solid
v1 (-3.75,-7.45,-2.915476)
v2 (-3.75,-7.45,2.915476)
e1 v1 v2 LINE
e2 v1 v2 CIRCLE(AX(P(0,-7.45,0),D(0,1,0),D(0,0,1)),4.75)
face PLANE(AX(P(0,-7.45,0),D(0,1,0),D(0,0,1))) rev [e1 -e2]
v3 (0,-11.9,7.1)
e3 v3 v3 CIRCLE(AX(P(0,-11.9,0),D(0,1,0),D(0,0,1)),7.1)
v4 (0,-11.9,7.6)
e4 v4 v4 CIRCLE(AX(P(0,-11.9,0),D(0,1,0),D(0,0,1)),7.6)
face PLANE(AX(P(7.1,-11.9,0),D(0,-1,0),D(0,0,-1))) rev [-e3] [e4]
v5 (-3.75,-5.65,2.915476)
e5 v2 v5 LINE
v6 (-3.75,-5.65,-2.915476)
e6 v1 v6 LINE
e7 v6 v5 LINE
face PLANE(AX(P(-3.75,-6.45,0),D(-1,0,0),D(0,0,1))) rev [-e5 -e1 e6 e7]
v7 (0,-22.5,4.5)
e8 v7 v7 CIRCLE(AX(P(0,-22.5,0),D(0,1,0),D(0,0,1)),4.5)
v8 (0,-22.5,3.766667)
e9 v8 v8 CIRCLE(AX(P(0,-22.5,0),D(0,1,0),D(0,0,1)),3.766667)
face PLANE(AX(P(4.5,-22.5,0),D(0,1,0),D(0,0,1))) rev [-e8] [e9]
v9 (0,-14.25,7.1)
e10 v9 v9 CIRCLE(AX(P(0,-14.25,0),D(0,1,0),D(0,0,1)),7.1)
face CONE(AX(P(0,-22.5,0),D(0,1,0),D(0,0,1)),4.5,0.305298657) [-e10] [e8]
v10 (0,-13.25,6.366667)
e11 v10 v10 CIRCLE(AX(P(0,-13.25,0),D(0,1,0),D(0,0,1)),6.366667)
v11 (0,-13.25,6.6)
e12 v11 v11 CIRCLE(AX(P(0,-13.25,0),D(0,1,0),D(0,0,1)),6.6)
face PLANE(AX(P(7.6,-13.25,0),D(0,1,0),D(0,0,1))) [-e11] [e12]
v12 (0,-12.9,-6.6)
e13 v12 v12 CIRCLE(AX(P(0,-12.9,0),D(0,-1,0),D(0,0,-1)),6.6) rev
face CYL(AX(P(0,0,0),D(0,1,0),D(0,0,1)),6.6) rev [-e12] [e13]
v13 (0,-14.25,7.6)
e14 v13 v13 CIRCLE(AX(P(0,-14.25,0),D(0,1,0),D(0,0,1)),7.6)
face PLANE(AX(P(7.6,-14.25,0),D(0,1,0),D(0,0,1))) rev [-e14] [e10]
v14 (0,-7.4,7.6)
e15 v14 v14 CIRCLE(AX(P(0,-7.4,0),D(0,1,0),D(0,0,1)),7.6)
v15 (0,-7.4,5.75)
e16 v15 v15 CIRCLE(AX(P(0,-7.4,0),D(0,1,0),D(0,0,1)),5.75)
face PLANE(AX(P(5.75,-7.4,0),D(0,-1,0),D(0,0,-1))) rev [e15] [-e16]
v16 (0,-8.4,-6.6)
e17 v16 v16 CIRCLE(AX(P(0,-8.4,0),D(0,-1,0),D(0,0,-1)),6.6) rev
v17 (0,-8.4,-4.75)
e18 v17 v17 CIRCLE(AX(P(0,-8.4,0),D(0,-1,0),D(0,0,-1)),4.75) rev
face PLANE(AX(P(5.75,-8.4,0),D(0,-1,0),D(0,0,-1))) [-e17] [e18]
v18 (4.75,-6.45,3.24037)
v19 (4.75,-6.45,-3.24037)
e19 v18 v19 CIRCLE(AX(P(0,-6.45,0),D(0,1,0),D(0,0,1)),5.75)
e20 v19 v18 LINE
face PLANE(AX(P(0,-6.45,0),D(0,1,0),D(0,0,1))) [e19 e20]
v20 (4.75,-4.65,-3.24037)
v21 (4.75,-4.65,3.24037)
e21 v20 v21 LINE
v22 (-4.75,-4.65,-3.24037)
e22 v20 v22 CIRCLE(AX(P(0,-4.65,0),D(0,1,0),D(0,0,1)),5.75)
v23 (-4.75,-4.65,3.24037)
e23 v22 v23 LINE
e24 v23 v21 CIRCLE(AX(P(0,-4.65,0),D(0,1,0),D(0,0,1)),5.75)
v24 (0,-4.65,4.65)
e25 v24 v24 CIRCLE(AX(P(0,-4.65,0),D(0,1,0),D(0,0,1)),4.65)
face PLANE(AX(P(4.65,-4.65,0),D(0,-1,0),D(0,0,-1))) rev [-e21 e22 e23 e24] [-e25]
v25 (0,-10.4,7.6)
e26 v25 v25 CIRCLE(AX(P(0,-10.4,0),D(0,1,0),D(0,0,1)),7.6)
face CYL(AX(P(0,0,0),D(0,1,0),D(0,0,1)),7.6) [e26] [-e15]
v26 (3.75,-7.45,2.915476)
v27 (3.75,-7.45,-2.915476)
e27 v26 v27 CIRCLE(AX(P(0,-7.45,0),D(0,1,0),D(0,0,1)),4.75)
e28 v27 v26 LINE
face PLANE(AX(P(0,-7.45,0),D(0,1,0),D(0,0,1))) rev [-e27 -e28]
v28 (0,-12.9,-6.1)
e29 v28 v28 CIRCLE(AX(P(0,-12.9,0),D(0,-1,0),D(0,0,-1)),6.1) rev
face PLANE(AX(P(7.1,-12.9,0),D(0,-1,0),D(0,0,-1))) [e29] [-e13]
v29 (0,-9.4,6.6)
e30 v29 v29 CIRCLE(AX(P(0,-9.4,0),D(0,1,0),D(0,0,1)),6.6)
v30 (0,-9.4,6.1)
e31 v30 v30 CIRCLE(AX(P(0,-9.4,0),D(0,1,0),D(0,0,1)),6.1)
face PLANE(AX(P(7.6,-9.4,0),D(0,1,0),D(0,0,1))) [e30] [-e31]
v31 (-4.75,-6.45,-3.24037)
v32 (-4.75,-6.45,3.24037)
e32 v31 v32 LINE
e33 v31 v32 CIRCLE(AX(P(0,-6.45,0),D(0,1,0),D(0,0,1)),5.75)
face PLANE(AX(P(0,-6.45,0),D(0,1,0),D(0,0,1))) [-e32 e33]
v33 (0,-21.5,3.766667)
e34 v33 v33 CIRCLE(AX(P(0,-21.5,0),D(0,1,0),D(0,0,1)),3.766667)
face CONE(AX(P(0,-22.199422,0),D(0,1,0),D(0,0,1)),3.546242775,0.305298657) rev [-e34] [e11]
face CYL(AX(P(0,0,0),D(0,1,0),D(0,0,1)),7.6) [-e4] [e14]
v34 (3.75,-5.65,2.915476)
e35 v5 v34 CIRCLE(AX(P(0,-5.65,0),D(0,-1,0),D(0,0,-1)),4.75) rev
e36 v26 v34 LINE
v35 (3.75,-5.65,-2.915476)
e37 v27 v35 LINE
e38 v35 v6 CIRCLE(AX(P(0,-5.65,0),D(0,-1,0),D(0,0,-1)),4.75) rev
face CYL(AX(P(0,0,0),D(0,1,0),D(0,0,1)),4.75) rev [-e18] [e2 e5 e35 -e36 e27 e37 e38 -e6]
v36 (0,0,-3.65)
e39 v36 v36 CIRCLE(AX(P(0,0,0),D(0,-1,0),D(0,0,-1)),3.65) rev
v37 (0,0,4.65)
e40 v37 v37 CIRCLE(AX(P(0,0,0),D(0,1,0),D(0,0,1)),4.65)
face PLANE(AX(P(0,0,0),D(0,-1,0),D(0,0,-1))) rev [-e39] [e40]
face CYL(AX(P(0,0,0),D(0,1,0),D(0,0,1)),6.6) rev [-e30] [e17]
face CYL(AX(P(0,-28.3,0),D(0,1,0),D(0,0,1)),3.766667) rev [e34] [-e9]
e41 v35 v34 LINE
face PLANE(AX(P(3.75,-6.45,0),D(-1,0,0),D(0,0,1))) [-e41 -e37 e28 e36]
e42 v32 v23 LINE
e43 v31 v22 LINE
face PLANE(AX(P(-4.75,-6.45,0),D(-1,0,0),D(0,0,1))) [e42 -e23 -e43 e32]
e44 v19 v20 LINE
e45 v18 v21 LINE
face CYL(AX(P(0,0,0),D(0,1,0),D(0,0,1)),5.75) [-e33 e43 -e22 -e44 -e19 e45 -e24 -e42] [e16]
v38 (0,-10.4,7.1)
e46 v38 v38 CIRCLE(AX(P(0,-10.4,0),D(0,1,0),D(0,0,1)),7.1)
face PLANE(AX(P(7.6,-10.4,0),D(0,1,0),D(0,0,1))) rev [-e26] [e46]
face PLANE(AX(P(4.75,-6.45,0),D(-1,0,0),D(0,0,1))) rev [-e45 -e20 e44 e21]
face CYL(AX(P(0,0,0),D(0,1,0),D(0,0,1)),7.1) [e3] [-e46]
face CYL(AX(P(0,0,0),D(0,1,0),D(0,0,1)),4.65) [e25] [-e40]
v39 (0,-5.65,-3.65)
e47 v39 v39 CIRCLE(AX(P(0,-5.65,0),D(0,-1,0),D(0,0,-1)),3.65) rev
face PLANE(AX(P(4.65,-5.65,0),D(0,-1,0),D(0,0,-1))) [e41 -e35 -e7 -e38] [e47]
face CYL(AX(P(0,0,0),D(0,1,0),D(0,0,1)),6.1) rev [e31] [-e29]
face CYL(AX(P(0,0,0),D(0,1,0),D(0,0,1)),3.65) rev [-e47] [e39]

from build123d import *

# Parameters (mm, degrees)
CUT_EXTRUDE1_DEPTH   = 1.8
SHELL1_START         = -21.5
SHELL1_OUTLINE_R     = 3.65
SHELL1_DEPTH         = 21.5
SHELL1_START_2       = -13.25
SHELL1_2_OUTLINE_R   = 6.1
SHELL1_2_OUTLINE_R_2 = 3.65
SHELL1_2_DEPTH       = 4.85
SHELL1_START_3       = -8.4
SHELL1_3_OUTLINE_R   = 3.65
SHELL1_3_DEPTH       = 2.75
SHELL1_START_4       = -9.4
SHELL1_4_OUTLINE_R   = 6.6
SHELL1_4_OUTLINE_R_2 = 6.1
SHELL1_4_DEPTH       = 1
SHELL1_5_DEPTH       = 0.95
SHELL1_6_OUTLINE_R   = 6.6
SHELL1_6_OUTLINE_R_2 = 6.1
SHELL1_6_DEPTH       = 0.35
SKETCH3_R            = 3.766666667
CUT_EXTRUDE2_DEPTH   = 6.8


with BuildPart() as part:
    # Sketch1 → Revolve1 (revolve)
    with BuildSketch(Plane.XY, mode=Mode.PRIVATE) as revolve1_sk:
        Polygon((0, 0), (0, -22.5), (4.5, -22.5), (7.1, -14.25), (7.6, -14.25), (7.6, -11.9), (7.1, -11.9), (7.1, -10.4), (7.6, -10.4), (7.6, -7.4), (5.75, -7.4), (5.75, -4.65), (4.65, -4.65), (4.65, 0), align=None)
    revolve(revolve1_sk.sketch.rotate(Axis((0, 0, 0), (0, -1, 0)), 90), axis=Axis((0, 0, 0), (0, -1, 0)))

    # Sketch2 → Cut-Extrude1 (cut)
    with BuildSketch(Plane(origin=(0, -4.65, 0), x_dir=(1, 0, 0), z_dir=(0, 1, 0))):
        with BuildLine():
            Line((-4.75, -3.240370349), (-4.75, 3.240370349))
            ThreePointArc((-4.75, 3.240370349), (-5.75, 0), (-4.75, -3.240370349))
        make_face()
        with BuildLine():
            ThreePointArc((5.75, 0), (5.494315244, 1.695582496), (4.75, 3.240370349))
            Line((4.75, 3.240370349), (4.75, -3.240370349))
            ThreePointArc((4.75, -3.240370349), (5.494315244, -1.695582496), (5.75, 0))
        make_face()
    extrude(amount=-CUT_EXTRUDE1_DEPTH, mode=Mode.SUBTRACT)

    # Shell1: read off the stored shape, not the designer's step
    # Shell1 outline → Shell1 (cut)
    with BuildSketch(Plane(origin=(0, 0, 0), x_dir=(1, 0, 0), z_dir=(0, 1, 0)).offset(SHELL1_START)):
        Circle(SHELL1_OUTLINE_R)
    extrude(amount=SHELL1_DEPTH, mode=Mode.SUBTRACT)

    # Shell1 2 outline → Shell1 2 (cut)
    with BuildSketch(Plane(origin=(0, 0, 0), x_dir=(1, 0, 0), z_dir=(0, 1, 0)).offset(SHELL1_START_2)):
        Circle(SHELL1_2_OUTLINE_R)
        Circle(SHELL1_2_OUTLINE_R_2, mode=Mode.SUBTRACT)
    extrude(amount=SHELL1_2_DEPTH, mode=Mode.SUBTRACT)

    # Shell1 3 outline → Shell1 3 (cut)
    with BuildSketch(Plane(origin=(0, 0, 0), x_dir=(1, 0, 0), z_dir=(0, 1, 0)).offset(SHELL1_START_3)):
        with BuildLine():
            Line((3.75, -2.915475947), (3.75, 2.915475947))
            ThreePointArc((3.75, 2.915475947), (0, 4.75), (-3.75, 2.915475947))
            Line((-3.75, 2.915475947), (-3.75, -2.915475947))
            ThreePointArc((-3.75, -2.915475947), (0, -4.75), (3.75, -2.915475947))
        make_face()
        Circle(SHELL1_3_OUTLINE_R, mode=Mode.SUBTRACT)
    extrude(amount=SHELL1_3_DEPTH, mode=Mode.SUBTRACT)

    # Shell1 4 outline → Shell1 4 (cut)
    with BuildSketch(Plane(origin=(0, 0, 0), x_dir=(1, 0, 0), z_dir=(0, 1, 0)).offset(SHELL1_START_4)):
        Circle(SHELL1_4_OUTLINE_R)
        Circle(SHELL1_4_OUTLINE_R_2, mode=Mode.SUBTRACT)
    extrude(amount=SHELL1_4_DEPTH, mode=Mode.SUBTRACT)

    # Shell1 5 outline → Shell1 5 (cut)
    with BuildSketch(Plane(origin=(0, 0, 0), x_dir=(1, 0, 0), z_dir=(0, 1, 0)).offset(SHELL1_START_3)):
        with BuildLine():
            ThreePointArc((3.75, -2.915475947), (4.75, 0), (3.75, 2.915475947))
            Line((3.75, 2.915475947), (3.75, -2.915475947))
        make_face()
        with BuildLine():
            Line((-3.75, -2.915475947), (-3.75, 2.915475947))
            ThreePointArc((-3.75, 2.915475947), (-4.75, 0), (-3.75, -2.915475947))
        make_face()
    extrude(amount=SHELL1_5_DEPTH, mode=Mode.SUBTRACT)

    # Shell1 6 outline → Shell1 6 (cut)
    with BuildSketch(Plane(origin=(0, 0, 0), x_dir=(1, 0, 0), z_dir=(0, 1, 0)).offset(SHELL1_START_2)):
        Circle(SHELL1_6_OUTLINE_R)
        Circle(SHELL1_6_OUTLINE_R_2, mode=Mode.SUBTRACT)
    extrude(amount=SHELL1_6_DEPTH, mode=Mode.SUBTRACT)

    # Shell1 7 outline → Shell1 7 (revolve, cut)
    with BuildSketch(Plane.XY):
        Polygon((6.366666667, -13.25), (3.65, -13.25), (3.65, -21.5), (3.766666667, -21.5), align=None)
    revolve(axis=Axis((0, 0, 0), (0, 1, 0)), mode=Mode.SUBTRACT)

    # Sketch3 → Cut-Extrude2 (cut)
    with BuildSketch(Plane(origin=(0, -21.5, 0), x_dir=(1, 0, 0), z_dir=(0, 1, 0))):
        with Locations(Location((0, 0, 0), (0, 0, 270))):
            Circle(SKETCH3_R)
    extrude(amount=-CUT_EXTRUDE2_DEPTH, mode=Mode.SUBTRACT)


solid = part.part
